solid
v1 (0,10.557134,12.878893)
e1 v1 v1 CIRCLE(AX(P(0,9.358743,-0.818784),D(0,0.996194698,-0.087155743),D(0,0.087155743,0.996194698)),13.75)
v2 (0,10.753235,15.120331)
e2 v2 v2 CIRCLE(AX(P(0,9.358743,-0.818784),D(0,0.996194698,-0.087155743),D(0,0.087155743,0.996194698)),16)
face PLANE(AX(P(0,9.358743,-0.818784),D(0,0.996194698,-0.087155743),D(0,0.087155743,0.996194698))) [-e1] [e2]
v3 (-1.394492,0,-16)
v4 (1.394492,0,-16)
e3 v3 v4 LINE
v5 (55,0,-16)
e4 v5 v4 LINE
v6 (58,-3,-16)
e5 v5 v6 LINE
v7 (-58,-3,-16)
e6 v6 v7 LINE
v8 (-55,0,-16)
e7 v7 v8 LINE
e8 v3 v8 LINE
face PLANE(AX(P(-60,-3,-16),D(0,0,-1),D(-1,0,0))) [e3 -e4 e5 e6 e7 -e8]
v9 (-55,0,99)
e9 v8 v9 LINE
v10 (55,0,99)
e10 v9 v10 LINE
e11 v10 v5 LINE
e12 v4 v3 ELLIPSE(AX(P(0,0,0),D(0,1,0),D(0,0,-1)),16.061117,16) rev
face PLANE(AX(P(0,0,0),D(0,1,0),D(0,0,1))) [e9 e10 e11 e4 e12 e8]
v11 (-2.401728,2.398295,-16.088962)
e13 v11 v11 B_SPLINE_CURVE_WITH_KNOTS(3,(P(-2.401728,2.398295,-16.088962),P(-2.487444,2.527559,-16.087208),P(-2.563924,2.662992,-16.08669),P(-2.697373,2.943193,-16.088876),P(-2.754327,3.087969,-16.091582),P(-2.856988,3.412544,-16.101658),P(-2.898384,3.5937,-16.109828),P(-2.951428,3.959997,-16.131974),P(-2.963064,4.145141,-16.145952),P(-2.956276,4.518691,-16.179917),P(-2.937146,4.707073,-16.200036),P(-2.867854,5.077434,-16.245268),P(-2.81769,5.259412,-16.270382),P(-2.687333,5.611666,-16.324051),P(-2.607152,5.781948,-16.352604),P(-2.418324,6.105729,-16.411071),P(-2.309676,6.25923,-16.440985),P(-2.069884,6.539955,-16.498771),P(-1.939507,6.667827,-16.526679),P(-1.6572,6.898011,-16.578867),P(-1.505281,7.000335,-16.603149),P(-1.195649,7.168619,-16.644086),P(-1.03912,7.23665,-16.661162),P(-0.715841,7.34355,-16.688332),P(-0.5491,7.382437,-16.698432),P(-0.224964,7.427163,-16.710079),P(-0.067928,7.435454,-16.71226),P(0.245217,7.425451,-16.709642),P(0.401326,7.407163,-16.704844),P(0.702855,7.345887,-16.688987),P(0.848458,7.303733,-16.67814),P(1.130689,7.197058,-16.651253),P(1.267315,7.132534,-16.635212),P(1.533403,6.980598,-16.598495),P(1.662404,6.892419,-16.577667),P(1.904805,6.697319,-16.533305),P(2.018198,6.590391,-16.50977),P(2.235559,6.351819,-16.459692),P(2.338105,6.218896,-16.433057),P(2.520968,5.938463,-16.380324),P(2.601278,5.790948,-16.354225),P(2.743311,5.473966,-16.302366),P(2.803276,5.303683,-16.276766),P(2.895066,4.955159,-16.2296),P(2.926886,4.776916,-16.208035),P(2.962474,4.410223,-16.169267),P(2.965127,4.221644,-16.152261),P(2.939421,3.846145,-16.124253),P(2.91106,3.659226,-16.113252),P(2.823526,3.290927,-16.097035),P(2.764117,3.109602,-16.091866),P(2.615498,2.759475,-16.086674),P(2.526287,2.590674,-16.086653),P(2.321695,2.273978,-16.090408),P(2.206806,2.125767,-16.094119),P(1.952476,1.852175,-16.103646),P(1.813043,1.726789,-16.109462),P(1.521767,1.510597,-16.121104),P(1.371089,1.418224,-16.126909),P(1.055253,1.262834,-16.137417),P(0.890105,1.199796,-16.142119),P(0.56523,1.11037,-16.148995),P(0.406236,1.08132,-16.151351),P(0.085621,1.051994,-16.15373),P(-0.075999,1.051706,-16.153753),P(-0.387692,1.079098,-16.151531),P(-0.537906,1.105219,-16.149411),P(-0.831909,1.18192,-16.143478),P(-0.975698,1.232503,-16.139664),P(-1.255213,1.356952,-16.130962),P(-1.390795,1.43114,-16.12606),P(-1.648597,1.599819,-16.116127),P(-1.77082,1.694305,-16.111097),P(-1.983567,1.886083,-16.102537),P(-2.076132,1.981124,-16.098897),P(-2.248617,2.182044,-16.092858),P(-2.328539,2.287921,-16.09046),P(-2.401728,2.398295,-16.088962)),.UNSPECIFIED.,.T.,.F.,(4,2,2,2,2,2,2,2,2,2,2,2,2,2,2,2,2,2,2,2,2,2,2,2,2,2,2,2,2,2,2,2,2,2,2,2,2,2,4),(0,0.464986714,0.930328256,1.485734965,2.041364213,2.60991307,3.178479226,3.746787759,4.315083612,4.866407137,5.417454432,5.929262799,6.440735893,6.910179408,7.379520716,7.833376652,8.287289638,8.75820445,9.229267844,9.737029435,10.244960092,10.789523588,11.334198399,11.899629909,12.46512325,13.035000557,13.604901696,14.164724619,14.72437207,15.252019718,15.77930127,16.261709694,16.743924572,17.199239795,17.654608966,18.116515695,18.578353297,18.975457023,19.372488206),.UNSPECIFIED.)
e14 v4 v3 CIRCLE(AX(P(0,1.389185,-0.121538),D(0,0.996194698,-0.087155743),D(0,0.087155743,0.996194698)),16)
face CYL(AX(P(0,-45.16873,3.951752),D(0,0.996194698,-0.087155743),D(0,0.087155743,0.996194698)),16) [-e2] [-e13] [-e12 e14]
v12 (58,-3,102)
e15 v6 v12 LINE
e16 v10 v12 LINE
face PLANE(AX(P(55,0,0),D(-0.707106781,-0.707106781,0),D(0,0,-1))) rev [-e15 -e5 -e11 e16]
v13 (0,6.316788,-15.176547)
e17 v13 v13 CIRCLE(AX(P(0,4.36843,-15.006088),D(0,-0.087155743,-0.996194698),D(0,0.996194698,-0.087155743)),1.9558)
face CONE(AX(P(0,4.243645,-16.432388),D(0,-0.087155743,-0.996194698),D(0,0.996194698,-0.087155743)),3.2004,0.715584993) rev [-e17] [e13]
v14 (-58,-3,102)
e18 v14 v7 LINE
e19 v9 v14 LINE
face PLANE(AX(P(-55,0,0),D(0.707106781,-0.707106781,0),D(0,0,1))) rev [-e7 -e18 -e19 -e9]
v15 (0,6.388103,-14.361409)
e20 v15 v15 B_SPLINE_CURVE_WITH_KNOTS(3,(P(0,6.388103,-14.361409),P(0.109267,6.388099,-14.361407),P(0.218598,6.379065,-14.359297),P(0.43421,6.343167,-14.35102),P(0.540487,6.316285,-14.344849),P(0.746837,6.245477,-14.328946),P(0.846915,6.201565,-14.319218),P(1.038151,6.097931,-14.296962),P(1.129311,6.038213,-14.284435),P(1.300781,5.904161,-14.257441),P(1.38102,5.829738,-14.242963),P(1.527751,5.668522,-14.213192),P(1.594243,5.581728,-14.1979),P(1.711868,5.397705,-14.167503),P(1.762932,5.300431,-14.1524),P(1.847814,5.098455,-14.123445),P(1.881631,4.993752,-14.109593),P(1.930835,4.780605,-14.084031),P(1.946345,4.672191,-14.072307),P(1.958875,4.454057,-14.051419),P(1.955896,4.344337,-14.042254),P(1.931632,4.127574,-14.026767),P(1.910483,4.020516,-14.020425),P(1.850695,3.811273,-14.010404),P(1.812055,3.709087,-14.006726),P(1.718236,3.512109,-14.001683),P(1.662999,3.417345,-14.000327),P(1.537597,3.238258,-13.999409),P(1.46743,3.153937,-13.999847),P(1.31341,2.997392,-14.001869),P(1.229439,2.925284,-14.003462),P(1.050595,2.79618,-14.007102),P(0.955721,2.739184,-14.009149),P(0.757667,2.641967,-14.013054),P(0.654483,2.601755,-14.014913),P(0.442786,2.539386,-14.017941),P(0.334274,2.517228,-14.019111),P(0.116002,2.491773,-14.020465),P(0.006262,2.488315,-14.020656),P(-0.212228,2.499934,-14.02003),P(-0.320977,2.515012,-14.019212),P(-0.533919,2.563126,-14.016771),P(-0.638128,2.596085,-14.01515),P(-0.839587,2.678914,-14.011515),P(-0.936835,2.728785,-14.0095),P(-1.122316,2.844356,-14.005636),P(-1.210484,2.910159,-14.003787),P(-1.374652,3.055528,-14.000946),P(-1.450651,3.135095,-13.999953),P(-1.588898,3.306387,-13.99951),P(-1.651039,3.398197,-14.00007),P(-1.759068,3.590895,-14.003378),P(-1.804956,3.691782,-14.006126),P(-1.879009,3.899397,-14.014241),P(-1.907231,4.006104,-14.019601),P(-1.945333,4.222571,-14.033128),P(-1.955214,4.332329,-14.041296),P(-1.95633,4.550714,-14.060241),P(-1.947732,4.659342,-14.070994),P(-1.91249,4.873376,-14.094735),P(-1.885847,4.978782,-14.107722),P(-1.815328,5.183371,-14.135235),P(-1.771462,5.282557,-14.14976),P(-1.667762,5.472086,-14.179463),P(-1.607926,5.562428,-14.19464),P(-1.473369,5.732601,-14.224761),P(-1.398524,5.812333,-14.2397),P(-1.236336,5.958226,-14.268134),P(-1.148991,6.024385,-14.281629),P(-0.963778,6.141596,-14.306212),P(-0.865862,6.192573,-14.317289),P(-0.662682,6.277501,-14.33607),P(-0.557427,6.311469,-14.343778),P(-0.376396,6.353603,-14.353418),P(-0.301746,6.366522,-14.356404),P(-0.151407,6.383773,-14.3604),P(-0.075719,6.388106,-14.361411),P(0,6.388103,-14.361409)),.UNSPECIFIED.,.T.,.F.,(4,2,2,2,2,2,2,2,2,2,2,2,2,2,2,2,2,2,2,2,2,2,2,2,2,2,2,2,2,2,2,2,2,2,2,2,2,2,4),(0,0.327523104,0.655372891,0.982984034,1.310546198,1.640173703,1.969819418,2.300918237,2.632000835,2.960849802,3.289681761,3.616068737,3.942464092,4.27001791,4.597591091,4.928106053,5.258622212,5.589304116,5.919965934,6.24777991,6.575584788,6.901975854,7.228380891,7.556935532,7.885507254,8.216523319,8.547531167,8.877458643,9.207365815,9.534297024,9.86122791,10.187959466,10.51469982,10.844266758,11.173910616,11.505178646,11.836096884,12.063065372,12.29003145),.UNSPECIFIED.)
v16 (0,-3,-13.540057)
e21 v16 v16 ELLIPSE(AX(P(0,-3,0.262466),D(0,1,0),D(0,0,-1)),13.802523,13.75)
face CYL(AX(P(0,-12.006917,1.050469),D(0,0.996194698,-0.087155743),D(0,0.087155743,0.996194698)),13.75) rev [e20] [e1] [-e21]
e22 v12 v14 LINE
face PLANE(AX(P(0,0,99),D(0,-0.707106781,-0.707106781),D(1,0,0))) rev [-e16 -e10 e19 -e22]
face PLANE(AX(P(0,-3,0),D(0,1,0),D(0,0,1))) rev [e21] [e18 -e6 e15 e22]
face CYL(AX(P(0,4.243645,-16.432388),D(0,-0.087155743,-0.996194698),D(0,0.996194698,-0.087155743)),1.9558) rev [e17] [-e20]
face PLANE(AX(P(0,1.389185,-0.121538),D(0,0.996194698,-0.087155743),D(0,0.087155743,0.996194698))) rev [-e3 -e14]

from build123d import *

# Parameters (mm, degrees)
SKETCH1_W                                      = 120
SKETCH1_H                                      = 120
BOSS_EXTRUDE1_DEPTH                            = 3
SKETCH2_R                                      = 16
BOSS_EXTRUDE2_DEPTH                            = 8
BOSS_EXTRUDE2_DIRECTION_2_REACH                = 122.252
SKETCH3_R                                      = 13.75
CUT_EXTRUDE1_DEPTH                             = 122.407232036
CHAMFER1_SIZE                                  = 5
CSK_FOR_5_FLAT_HEAD_MACHINE_SCREW2_D           = 3.9116
CSK_FOR_5_FLAT_HEAD_MACHINE_SCREW2_DEPTH       = 10.1
CSK_FOR_5_FLAT_HEAD_MACHINE_SCREW2_CSINK_D     = 6.4008
CSK_FOR_5_FLAT_HEAD_MACHINE_SCREW2_CSINK_ANGLE = 82
CSK_FOR_5_FLAT_HEAD_MACHINE_SCREW2_TIP         = 1.175163199


with BuildPart() as part:
    # Sketch1 → Boss-Extrude1 (new body)
    with BuildSketch(Plane(origin=(0, 0, 0), x_dir=(1, 0, 0), z_dir=(0, 1, 0))):
        with Locations((0, -44)):
            Rectangle(SKETCH1_W, SKETCH1_H)
    extrude(amount=-BOSS_EXTRUDE1_DEPTH)

    # Sketch2 → Boss-Extrude2 (add)
    with BuildSketch(Plane(origin=(0, 1.389185421, -0.121537976), x_dir=(-1, 0, 0), z_dir=(0, 0.9961946980917455, -0.08715574274765836))):
        with Locations(Location((0, 0, 0), (0, 0, 90))):
            Circle(SKETCH2_R)
    extrude(amount=BOSS_EXTRUDE2_DEPTH)

    # Boss-Extrude2 direction 2: up to this face of the body (flat: up to its plane)
    boss_extrude2_direction_2_end = Plane(part.part.faces().sort_by_distance((0, 0, 44))[0])
    # Sketch2 → Boss-Extrude2 direction 2 (add, up to the picked face)
    with BuildSketch(Plane(origin=(0, 1.389185421, -0.121537976), x_dir=(-1, 0, 0), z_dir=(0, 0.9961946980917455, -0.08715574274765836)), mode=Mode.PRIVATE) as boss_extrude2_direction_2_sk1:
        with Locations(Location((0, 0, 0), (0, 0, 90))):
            Circle(SKETCH2_R)
    boss_extrude2_direction_2_tool1 = split(extrude(boss_extrude2_direction_2_sk1.sketch, amount=-BOSS_EXTRUDE2_DIRECTION_2_REACH, mode=Mode.PRIVATE), bisect_by=boss_extrude2_direction_2_end, keep=Keep.BOTH, mode=Mode.PRIVATE)
    add(boss_extrude2_direction_2_tool1.solids().sort_by(Axis((0, 1.389185, -0.121538), (0, -0.9961946980917455, 0.08715574274765836)))[0])

    # Sketch3 → Cut-Extrude1 (cut, through all)
    with BuildSketch(Plane(origin=(0, 9.358743006, -0.818783918), x_dir=(1, 0, 0), z_dir=(0, 0.9961946980917457, -0.08715574274765836))):
        with Locations(Location((0, 0, 0), (0, 0, 270))):
            Circle(SKETCH3_R)
    extrude(amount=-CUT_EXTRUDE1_DEPTH, mode=Mode.SUBTRACT)

    # Chamfer1
    # the kernel refuses this chamfer: 5 mm, written as the material it takes off along each edge
    with BuildSketch(Plane(origin=(60, 0, -28.85841494), x_dir=(-0.9996219169112968, 0.027495876610586372, 0), z_dir=(0, 0, 1)), Plane(origin=(72.85841494, 0, 104), x_dir=(0, 0.027495876610586334, -0.9996219169112968), z_dir=(-1, 0, 0)), Plane(origin=(-60, 0, 116.85841494), x_dir=(0.9996219169112968, 0.027495876610586372, 0), z_dir=(0, 0, -1))) as chamfer1_piece_1:
        Polygon((CHAMFER1_SIZE * 0.999621916911, CHAMFER1_SIZE * 0.0274958766106), (-CHAMFER1_SIZE * 0.0274958766106, CHAMFER1_SIZE * 0.999621916911), (0, 0), align=None)
    extrude(amount=145.71682988, mode=Mode.SUBTRACT)

    # CSK for #5 Flat Head Machine Screw2
    with Locations(Plane(origin=(0, 4.243645214, -16.432388249), x_dir=(0, -0.996194698092, 0.087155742748), z_dir=(0, -0.087155742748, -0.996194698092))):
        with Locations((0, 0)):
            CounterSinkHole(CSK_FOR_5_FLAT_HEAD_MACHINE_SCREW2_D / 2, CSK_FOR_5_FLAT_HEAD_MACHINE_SCREW2_CSINK_D / 2, depth=CSK_FOR_5_FLAT_HEAD_MACHINE_SCREW2_DEPTH, counter_sink_angle=CSK_FOR_5_FLAT_HEAD_MACHINE_SCREW2_CSINK_ANGLE)
            with Locations((0, 0, -(CSK_FOR_5_FLAT_HEAD_MACHINE_SCREW2_DEPTH + CSK_FOR_5_FLAT_HEAD_MACHINE_SCREW2_TIP / 2))):  # 118° drill point
                Cone(0, CSK_FOR_5_FLAT_HEAD_MACHINE_SCREW2_D / 2, CSK_FOR_5_FLAT_HEAD_MACHINE_SCREW2_TIP, mode=Mode.SUBTRACT)


solid = part.part
